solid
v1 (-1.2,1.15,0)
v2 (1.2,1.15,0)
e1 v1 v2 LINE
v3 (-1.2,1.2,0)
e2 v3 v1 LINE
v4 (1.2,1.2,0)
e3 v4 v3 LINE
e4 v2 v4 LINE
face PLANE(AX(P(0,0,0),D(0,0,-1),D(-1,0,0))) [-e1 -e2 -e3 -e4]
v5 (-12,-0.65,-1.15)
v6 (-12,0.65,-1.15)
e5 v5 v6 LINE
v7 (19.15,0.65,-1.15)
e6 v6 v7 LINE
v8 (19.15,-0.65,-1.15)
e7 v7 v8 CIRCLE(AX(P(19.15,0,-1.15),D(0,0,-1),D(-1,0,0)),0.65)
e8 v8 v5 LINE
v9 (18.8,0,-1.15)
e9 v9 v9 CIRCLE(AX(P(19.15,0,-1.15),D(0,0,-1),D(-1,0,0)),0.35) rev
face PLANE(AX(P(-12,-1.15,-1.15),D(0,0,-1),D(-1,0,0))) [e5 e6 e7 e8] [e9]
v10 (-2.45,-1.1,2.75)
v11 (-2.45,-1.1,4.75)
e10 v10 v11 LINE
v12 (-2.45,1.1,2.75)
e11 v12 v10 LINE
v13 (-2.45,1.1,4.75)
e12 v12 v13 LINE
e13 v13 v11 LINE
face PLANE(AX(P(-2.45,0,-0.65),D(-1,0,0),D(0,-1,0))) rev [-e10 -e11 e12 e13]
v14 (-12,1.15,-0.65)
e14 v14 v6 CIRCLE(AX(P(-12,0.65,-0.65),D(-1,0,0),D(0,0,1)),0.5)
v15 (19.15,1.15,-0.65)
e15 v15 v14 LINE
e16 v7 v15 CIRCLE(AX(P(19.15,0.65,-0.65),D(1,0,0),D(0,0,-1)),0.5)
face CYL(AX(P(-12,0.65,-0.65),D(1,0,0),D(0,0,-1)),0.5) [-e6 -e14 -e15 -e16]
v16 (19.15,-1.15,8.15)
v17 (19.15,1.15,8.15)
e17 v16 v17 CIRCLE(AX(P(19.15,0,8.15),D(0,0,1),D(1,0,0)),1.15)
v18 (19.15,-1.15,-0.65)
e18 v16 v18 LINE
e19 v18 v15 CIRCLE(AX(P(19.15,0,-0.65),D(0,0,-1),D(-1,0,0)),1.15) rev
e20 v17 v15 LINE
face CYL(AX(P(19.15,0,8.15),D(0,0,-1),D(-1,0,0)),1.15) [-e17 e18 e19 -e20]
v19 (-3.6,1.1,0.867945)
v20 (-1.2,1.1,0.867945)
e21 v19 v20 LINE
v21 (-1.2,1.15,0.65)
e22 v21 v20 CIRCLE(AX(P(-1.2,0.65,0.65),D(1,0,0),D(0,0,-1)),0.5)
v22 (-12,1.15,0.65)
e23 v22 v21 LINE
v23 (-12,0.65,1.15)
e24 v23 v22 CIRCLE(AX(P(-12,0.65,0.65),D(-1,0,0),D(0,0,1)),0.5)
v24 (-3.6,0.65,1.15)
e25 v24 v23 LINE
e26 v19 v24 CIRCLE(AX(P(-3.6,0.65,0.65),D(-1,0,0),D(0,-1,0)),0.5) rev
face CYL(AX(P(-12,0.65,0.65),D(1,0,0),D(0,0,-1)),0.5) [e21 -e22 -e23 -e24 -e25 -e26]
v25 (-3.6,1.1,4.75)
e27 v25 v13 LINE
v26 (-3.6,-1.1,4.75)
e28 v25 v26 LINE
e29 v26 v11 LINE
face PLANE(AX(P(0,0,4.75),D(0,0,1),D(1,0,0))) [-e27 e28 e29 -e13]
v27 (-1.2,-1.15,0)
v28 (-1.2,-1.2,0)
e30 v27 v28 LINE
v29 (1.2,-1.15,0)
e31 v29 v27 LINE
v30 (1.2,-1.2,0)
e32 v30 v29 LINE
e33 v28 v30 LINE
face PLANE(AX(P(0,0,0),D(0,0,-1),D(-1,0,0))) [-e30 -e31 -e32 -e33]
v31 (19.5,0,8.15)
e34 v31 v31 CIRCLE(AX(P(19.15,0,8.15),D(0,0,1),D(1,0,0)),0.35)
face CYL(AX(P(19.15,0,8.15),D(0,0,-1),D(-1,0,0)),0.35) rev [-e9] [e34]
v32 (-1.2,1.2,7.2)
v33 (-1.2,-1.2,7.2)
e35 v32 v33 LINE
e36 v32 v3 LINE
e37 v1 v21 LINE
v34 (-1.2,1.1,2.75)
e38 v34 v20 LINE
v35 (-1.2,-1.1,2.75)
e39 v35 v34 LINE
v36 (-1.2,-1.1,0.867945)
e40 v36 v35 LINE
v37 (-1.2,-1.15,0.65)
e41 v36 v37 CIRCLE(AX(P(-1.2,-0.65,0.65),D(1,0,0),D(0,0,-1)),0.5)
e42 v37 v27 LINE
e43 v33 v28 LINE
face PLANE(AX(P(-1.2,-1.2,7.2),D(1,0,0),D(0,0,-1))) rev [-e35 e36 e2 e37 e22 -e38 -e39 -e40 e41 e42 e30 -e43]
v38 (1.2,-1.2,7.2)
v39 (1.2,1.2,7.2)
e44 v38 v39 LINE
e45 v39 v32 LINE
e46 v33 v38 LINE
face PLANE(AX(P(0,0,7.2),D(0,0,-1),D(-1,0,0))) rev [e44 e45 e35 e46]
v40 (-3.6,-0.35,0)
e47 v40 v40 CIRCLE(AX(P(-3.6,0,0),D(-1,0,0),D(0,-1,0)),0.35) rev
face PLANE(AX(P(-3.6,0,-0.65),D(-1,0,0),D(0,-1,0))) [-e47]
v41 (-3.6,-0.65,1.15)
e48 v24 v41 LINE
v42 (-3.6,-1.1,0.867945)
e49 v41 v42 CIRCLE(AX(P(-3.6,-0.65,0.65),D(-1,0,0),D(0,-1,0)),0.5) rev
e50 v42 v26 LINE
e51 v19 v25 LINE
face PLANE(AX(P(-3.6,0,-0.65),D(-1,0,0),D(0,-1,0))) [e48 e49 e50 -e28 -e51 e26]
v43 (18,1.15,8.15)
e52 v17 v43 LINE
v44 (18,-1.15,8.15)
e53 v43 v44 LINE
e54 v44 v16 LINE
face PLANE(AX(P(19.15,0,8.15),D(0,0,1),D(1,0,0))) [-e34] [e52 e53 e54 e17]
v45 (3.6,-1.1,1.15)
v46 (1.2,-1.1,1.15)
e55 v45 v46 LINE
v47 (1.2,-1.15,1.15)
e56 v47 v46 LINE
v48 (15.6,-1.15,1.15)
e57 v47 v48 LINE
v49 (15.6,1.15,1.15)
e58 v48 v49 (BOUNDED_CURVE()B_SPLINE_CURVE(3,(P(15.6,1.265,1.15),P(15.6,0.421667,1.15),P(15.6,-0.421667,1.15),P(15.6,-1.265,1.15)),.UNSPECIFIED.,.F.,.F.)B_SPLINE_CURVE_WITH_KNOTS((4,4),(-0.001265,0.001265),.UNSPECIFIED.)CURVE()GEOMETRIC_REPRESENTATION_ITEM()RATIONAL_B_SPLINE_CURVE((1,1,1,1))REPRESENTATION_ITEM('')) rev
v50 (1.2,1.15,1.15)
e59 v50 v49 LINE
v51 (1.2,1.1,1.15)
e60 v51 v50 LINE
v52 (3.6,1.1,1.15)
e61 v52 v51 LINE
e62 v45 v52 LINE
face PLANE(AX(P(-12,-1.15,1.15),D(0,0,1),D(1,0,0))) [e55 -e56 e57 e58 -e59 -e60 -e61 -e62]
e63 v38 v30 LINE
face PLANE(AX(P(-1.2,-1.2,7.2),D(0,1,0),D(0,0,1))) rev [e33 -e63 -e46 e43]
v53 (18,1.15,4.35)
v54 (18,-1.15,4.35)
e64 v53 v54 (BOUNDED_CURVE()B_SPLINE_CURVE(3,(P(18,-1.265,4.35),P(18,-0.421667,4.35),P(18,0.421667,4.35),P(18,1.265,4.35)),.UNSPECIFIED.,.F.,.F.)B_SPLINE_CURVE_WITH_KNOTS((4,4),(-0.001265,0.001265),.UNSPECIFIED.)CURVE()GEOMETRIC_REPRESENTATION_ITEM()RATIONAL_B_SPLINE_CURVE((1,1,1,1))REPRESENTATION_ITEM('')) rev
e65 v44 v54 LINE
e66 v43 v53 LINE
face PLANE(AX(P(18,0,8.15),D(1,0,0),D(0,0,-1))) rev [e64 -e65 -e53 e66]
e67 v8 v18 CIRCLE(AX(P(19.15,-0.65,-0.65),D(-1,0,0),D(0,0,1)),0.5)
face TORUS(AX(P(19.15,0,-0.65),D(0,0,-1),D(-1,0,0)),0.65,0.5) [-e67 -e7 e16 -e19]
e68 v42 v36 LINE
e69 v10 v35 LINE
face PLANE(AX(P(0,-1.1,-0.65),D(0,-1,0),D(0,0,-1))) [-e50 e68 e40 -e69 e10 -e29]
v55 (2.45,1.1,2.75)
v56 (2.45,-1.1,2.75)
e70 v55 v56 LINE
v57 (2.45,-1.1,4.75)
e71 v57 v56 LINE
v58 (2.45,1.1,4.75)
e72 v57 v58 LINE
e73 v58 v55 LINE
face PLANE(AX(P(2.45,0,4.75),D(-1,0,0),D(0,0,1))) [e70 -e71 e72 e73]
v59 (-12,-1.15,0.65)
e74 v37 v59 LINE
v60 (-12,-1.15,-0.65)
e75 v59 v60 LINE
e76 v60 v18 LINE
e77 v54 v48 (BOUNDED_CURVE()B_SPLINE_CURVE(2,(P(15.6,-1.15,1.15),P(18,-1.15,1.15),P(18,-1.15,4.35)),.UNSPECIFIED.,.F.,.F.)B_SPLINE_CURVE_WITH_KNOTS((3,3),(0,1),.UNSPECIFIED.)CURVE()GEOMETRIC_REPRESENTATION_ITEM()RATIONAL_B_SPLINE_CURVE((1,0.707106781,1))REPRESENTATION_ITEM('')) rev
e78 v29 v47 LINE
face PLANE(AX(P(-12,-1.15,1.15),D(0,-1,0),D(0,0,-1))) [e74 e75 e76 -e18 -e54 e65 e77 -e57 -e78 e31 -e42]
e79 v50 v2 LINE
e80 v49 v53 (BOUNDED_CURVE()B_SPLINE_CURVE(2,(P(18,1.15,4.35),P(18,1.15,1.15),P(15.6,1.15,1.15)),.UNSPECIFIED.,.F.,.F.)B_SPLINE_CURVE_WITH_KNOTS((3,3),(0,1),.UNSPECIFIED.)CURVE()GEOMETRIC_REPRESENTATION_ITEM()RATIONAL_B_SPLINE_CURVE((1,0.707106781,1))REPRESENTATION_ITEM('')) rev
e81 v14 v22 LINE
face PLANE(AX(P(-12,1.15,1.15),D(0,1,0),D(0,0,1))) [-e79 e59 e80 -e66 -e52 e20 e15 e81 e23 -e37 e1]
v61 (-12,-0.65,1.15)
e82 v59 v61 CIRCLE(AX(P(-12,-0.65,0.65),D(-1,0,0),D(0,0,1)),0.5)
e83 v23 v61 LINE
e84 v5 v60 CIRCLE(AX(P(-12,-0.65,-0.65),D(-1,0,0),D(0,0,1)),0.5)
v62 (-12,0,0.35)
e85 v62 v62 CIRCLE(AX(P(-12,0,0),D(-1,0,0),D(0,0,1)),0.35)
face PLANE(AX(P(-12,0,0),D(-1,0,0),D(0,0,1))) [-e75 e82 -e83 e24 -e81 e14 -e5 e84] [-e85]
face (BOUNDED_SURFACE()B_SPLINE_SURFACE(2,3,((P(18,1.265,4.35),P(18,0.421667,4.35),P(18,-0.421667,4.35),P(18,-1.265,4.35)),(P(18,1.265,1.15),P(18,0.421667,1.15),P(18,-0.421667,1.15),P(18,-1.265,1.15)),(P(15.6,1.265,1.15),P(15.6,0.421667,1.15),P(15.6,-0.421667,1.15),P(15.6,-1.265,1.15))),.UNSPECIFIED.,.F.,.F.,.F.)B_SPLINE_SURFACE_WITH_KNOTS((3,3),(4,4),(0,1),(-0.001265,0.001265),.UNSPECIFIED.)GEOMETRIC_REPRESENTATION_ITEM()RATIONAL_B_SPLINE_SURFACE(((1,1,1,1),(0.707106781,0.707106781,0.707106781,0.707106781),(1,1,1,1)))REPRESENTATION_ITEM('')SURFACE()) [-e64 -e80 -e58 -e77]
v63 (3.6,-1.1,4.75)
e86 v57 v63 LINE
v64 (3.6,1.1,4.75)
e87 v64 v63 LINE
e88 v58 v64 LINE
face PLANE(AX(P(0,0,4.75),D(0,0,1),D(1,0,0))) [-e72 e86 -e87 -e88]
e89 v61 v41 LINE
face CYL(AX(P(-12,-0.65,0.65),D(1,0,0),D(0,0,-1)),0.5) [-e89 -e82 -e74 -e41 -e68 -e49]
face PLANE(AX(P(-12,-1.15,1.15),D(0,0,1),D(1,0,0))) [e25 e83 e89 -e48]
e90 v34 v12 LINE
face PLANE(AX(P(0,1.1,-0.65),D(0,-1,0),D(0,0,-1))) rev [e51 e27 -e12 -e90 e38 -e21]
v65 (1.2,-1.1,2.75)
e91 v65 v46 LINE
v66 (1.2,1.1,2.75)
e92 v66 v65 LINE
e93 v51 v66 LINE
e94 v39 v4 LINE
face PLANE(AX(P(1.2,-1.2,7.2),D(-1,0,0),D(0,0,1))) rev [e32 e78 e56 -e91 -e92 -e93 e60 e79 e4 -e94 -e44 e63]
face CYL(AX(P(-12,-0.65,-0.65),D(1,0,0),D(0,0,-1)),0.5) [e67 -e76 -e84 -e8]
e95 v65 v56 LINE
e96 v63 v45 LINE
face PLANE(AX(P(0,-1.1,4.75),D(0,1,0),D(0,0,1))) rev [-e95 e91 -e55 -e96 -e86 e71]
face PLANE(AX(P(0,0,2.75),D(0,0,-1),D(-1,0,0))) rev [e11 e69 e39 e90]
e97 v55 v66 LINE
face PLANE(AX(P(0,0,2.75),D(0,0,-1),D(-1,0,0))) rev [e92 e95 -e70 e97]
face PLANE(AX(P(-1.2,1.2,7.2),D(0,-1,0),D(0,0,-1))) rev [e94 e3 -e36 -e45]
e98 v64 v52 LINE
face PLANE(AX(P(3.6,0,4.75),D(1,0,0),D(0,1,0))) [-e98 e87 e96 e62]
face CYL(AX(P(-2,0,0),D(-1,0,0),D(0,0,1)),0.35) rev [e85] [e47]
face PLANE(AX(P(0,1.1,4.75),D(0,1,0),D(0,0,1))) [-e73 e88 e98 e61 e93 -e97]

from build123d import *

# Parameters (mm, degrees)
SKETCH_1_W           = 2.4
SKETCH_1_H           = 2.4
EXTRUDE_1_DEPTH      = 7.2
EXTRUDE_2_DEPTH      = 18
EXTRUDE_2_DEPTH_BACK = 12
SKETCH_4_W           = 2.3
SKETCH_4_H           = 2.3
EXTRUDE_3_DEPTH      = 7
EXTRUDE_3_DEPTH_BACK = 2.3
SKETCH_5_R           = 0.35
SKETCH_6_R           = 0.35
CUT_EXTRUDE_1_DEPTH  = 10
FILLET_1_SIZE        = 2.4
FILLET_1_SIZE_2      = 3.2
FILLET_2_R           = 0.5
EXTRUDE_START        = -1.5
SKETCH_7_W           = 1.15
SKETCH_7_H           = 0.45
SKETCH_7_H_2         = 1.3
SKETCH_7_H_3         = 2.2
EXTRUDE_4_DEPTH      = 5.1
SKETCH_8_W           = 7.2
SKETCH_8_H           = 2.2
EXTRUDE_5_DEPTH      = 3.1


with BuildPart() as part:
    # 草图1 → 凸台-拉伸1 (new body)
    with BuildSketch(Plane.XY):
        Rectangle(SKETCH_1_W, SKETCH_1_H)
    extrude(amount=EXTRUDE_1_DEPTH)

    # 草图4 → 凸台-拉伸2 (add, two sides: drawn at the far end of the back side and taken through both)
    with BuildSketch(Plane(origin=(0, 0, 0), x_dir=(0, 0, -1), z_dir=(1, 0, 0)).offset(-EXTRUDE_2_DEPTH_BACK)):
        Rectangle(SKETCH_4_W, SKETCH_4_H)
    extrude(amount=EXTRUDE_2_DEPTH + EXTRUDE_2_DEPTH_BACK)

    # 草图5 → 凸台-拉伸3 (add, two sides: drawn at the far end of the back side and taken through both)
    with BuildSketch(Plane.XY.offset(1.15).offset(-EXTRUDE_3_DEPTH_BACK)):
        with BuildLine():
            Line((18, 0), (18, 1.15))
            Line((18, 1.15), (19.15, 1.15))
            ThreePointArc((19.15, 1.15), (20.3, 0), (19.15, -1.15))
            Line((19.15, -1.15), (18, -1.15))
            Line((18, -1.15), (18, 0))
        make_face()
        with Locations(Location((19.15, 0, 0), (0, 0, 180))):
            Circle(SKETCH_5_R, mode=Mode.SUBTRACT)
    extrude(amount=EXTRUDE_3_DEPTH + EXTRUDE_3_DEPTH_BACK)

    # 草图6 → 切除-拉伸1 (cut)
    with BuildSketch(Plane.ZY.offset(12)):
        Circle(SKETCH_6_R)
    extrude(amount=-CUT_EXTRUDE_1_DEPTH, mode=Mode.SUBTRACT)

    # 圆角1
    # an asymmetric fillet: 3.2, 2.4 mm, written as the material it adds along each edge
    with BuildSketch(Plane(origin=(18, 1.15, 1.15), x_dir=(-1, 0, 0), z_dir=(0, -1, 0))) as fillet_1_piece_1:
        with BuildLine():
            Bezier((FILLET_1_SIZE, 0), (0, 0), (0, -FILLET_1_SIZE_2), weights=[1, 0.707106781, 1])
            Line((0, -FILLET_1_SIZE_2), (0, 0))
            Line((0, 0), (FILLET_1_SIZE, 0))
        make_face()
    extrude(amount=2.3)

    # 圆角2
    fillet_2_edges = [part.edges().sort_by_distance(p)[0] for p in [
        (-6.6, -1.15, 1.15),
        (3.575, -1.15, -1.15),
        (-6.6, 1.15, 1.15),
        (3.575, 1.15, -1.15),
        (20.3, 0, -1.15),
    ]]
    fillet(fillet_2_edges, radius=FILLET_2_R)

    # 草图7 → 凸台-拉伸4 (add)
    with BuildSketch(Plane.XY.offset(1.15).offset(EXTRUDE_START)):
        with Locations((-3.025, 0.875)):
            Rectangle(SKETCH_7_W, SKETCH_7_H)
        with Locations((-3.025, 0)):
            Rectangle(SKETCH_7_W, SKETCH_7_H_2)
        with Locations((-3.025, -0.875)):
            Rectangle(SKETCH_7_W, SKETCH_7_H)
        with Locations((3.025, 0)):
            Rectangle(SKETCH_7_W, SKETCH_7_H_3)
    extrude(amount=EXTRUDE_4_DEPTH)

    # 草图8 → 凸台-拉伸5 (add)
    with BuildSketch(Plane.XY.offset(1.15).offset(EXTRUDE_START)):
        Rectangle(SKETCH_8_W, SKETCH_8_H)
    extrude(amount=EXTRUDE_5_DEPTH)


solid = part.part
